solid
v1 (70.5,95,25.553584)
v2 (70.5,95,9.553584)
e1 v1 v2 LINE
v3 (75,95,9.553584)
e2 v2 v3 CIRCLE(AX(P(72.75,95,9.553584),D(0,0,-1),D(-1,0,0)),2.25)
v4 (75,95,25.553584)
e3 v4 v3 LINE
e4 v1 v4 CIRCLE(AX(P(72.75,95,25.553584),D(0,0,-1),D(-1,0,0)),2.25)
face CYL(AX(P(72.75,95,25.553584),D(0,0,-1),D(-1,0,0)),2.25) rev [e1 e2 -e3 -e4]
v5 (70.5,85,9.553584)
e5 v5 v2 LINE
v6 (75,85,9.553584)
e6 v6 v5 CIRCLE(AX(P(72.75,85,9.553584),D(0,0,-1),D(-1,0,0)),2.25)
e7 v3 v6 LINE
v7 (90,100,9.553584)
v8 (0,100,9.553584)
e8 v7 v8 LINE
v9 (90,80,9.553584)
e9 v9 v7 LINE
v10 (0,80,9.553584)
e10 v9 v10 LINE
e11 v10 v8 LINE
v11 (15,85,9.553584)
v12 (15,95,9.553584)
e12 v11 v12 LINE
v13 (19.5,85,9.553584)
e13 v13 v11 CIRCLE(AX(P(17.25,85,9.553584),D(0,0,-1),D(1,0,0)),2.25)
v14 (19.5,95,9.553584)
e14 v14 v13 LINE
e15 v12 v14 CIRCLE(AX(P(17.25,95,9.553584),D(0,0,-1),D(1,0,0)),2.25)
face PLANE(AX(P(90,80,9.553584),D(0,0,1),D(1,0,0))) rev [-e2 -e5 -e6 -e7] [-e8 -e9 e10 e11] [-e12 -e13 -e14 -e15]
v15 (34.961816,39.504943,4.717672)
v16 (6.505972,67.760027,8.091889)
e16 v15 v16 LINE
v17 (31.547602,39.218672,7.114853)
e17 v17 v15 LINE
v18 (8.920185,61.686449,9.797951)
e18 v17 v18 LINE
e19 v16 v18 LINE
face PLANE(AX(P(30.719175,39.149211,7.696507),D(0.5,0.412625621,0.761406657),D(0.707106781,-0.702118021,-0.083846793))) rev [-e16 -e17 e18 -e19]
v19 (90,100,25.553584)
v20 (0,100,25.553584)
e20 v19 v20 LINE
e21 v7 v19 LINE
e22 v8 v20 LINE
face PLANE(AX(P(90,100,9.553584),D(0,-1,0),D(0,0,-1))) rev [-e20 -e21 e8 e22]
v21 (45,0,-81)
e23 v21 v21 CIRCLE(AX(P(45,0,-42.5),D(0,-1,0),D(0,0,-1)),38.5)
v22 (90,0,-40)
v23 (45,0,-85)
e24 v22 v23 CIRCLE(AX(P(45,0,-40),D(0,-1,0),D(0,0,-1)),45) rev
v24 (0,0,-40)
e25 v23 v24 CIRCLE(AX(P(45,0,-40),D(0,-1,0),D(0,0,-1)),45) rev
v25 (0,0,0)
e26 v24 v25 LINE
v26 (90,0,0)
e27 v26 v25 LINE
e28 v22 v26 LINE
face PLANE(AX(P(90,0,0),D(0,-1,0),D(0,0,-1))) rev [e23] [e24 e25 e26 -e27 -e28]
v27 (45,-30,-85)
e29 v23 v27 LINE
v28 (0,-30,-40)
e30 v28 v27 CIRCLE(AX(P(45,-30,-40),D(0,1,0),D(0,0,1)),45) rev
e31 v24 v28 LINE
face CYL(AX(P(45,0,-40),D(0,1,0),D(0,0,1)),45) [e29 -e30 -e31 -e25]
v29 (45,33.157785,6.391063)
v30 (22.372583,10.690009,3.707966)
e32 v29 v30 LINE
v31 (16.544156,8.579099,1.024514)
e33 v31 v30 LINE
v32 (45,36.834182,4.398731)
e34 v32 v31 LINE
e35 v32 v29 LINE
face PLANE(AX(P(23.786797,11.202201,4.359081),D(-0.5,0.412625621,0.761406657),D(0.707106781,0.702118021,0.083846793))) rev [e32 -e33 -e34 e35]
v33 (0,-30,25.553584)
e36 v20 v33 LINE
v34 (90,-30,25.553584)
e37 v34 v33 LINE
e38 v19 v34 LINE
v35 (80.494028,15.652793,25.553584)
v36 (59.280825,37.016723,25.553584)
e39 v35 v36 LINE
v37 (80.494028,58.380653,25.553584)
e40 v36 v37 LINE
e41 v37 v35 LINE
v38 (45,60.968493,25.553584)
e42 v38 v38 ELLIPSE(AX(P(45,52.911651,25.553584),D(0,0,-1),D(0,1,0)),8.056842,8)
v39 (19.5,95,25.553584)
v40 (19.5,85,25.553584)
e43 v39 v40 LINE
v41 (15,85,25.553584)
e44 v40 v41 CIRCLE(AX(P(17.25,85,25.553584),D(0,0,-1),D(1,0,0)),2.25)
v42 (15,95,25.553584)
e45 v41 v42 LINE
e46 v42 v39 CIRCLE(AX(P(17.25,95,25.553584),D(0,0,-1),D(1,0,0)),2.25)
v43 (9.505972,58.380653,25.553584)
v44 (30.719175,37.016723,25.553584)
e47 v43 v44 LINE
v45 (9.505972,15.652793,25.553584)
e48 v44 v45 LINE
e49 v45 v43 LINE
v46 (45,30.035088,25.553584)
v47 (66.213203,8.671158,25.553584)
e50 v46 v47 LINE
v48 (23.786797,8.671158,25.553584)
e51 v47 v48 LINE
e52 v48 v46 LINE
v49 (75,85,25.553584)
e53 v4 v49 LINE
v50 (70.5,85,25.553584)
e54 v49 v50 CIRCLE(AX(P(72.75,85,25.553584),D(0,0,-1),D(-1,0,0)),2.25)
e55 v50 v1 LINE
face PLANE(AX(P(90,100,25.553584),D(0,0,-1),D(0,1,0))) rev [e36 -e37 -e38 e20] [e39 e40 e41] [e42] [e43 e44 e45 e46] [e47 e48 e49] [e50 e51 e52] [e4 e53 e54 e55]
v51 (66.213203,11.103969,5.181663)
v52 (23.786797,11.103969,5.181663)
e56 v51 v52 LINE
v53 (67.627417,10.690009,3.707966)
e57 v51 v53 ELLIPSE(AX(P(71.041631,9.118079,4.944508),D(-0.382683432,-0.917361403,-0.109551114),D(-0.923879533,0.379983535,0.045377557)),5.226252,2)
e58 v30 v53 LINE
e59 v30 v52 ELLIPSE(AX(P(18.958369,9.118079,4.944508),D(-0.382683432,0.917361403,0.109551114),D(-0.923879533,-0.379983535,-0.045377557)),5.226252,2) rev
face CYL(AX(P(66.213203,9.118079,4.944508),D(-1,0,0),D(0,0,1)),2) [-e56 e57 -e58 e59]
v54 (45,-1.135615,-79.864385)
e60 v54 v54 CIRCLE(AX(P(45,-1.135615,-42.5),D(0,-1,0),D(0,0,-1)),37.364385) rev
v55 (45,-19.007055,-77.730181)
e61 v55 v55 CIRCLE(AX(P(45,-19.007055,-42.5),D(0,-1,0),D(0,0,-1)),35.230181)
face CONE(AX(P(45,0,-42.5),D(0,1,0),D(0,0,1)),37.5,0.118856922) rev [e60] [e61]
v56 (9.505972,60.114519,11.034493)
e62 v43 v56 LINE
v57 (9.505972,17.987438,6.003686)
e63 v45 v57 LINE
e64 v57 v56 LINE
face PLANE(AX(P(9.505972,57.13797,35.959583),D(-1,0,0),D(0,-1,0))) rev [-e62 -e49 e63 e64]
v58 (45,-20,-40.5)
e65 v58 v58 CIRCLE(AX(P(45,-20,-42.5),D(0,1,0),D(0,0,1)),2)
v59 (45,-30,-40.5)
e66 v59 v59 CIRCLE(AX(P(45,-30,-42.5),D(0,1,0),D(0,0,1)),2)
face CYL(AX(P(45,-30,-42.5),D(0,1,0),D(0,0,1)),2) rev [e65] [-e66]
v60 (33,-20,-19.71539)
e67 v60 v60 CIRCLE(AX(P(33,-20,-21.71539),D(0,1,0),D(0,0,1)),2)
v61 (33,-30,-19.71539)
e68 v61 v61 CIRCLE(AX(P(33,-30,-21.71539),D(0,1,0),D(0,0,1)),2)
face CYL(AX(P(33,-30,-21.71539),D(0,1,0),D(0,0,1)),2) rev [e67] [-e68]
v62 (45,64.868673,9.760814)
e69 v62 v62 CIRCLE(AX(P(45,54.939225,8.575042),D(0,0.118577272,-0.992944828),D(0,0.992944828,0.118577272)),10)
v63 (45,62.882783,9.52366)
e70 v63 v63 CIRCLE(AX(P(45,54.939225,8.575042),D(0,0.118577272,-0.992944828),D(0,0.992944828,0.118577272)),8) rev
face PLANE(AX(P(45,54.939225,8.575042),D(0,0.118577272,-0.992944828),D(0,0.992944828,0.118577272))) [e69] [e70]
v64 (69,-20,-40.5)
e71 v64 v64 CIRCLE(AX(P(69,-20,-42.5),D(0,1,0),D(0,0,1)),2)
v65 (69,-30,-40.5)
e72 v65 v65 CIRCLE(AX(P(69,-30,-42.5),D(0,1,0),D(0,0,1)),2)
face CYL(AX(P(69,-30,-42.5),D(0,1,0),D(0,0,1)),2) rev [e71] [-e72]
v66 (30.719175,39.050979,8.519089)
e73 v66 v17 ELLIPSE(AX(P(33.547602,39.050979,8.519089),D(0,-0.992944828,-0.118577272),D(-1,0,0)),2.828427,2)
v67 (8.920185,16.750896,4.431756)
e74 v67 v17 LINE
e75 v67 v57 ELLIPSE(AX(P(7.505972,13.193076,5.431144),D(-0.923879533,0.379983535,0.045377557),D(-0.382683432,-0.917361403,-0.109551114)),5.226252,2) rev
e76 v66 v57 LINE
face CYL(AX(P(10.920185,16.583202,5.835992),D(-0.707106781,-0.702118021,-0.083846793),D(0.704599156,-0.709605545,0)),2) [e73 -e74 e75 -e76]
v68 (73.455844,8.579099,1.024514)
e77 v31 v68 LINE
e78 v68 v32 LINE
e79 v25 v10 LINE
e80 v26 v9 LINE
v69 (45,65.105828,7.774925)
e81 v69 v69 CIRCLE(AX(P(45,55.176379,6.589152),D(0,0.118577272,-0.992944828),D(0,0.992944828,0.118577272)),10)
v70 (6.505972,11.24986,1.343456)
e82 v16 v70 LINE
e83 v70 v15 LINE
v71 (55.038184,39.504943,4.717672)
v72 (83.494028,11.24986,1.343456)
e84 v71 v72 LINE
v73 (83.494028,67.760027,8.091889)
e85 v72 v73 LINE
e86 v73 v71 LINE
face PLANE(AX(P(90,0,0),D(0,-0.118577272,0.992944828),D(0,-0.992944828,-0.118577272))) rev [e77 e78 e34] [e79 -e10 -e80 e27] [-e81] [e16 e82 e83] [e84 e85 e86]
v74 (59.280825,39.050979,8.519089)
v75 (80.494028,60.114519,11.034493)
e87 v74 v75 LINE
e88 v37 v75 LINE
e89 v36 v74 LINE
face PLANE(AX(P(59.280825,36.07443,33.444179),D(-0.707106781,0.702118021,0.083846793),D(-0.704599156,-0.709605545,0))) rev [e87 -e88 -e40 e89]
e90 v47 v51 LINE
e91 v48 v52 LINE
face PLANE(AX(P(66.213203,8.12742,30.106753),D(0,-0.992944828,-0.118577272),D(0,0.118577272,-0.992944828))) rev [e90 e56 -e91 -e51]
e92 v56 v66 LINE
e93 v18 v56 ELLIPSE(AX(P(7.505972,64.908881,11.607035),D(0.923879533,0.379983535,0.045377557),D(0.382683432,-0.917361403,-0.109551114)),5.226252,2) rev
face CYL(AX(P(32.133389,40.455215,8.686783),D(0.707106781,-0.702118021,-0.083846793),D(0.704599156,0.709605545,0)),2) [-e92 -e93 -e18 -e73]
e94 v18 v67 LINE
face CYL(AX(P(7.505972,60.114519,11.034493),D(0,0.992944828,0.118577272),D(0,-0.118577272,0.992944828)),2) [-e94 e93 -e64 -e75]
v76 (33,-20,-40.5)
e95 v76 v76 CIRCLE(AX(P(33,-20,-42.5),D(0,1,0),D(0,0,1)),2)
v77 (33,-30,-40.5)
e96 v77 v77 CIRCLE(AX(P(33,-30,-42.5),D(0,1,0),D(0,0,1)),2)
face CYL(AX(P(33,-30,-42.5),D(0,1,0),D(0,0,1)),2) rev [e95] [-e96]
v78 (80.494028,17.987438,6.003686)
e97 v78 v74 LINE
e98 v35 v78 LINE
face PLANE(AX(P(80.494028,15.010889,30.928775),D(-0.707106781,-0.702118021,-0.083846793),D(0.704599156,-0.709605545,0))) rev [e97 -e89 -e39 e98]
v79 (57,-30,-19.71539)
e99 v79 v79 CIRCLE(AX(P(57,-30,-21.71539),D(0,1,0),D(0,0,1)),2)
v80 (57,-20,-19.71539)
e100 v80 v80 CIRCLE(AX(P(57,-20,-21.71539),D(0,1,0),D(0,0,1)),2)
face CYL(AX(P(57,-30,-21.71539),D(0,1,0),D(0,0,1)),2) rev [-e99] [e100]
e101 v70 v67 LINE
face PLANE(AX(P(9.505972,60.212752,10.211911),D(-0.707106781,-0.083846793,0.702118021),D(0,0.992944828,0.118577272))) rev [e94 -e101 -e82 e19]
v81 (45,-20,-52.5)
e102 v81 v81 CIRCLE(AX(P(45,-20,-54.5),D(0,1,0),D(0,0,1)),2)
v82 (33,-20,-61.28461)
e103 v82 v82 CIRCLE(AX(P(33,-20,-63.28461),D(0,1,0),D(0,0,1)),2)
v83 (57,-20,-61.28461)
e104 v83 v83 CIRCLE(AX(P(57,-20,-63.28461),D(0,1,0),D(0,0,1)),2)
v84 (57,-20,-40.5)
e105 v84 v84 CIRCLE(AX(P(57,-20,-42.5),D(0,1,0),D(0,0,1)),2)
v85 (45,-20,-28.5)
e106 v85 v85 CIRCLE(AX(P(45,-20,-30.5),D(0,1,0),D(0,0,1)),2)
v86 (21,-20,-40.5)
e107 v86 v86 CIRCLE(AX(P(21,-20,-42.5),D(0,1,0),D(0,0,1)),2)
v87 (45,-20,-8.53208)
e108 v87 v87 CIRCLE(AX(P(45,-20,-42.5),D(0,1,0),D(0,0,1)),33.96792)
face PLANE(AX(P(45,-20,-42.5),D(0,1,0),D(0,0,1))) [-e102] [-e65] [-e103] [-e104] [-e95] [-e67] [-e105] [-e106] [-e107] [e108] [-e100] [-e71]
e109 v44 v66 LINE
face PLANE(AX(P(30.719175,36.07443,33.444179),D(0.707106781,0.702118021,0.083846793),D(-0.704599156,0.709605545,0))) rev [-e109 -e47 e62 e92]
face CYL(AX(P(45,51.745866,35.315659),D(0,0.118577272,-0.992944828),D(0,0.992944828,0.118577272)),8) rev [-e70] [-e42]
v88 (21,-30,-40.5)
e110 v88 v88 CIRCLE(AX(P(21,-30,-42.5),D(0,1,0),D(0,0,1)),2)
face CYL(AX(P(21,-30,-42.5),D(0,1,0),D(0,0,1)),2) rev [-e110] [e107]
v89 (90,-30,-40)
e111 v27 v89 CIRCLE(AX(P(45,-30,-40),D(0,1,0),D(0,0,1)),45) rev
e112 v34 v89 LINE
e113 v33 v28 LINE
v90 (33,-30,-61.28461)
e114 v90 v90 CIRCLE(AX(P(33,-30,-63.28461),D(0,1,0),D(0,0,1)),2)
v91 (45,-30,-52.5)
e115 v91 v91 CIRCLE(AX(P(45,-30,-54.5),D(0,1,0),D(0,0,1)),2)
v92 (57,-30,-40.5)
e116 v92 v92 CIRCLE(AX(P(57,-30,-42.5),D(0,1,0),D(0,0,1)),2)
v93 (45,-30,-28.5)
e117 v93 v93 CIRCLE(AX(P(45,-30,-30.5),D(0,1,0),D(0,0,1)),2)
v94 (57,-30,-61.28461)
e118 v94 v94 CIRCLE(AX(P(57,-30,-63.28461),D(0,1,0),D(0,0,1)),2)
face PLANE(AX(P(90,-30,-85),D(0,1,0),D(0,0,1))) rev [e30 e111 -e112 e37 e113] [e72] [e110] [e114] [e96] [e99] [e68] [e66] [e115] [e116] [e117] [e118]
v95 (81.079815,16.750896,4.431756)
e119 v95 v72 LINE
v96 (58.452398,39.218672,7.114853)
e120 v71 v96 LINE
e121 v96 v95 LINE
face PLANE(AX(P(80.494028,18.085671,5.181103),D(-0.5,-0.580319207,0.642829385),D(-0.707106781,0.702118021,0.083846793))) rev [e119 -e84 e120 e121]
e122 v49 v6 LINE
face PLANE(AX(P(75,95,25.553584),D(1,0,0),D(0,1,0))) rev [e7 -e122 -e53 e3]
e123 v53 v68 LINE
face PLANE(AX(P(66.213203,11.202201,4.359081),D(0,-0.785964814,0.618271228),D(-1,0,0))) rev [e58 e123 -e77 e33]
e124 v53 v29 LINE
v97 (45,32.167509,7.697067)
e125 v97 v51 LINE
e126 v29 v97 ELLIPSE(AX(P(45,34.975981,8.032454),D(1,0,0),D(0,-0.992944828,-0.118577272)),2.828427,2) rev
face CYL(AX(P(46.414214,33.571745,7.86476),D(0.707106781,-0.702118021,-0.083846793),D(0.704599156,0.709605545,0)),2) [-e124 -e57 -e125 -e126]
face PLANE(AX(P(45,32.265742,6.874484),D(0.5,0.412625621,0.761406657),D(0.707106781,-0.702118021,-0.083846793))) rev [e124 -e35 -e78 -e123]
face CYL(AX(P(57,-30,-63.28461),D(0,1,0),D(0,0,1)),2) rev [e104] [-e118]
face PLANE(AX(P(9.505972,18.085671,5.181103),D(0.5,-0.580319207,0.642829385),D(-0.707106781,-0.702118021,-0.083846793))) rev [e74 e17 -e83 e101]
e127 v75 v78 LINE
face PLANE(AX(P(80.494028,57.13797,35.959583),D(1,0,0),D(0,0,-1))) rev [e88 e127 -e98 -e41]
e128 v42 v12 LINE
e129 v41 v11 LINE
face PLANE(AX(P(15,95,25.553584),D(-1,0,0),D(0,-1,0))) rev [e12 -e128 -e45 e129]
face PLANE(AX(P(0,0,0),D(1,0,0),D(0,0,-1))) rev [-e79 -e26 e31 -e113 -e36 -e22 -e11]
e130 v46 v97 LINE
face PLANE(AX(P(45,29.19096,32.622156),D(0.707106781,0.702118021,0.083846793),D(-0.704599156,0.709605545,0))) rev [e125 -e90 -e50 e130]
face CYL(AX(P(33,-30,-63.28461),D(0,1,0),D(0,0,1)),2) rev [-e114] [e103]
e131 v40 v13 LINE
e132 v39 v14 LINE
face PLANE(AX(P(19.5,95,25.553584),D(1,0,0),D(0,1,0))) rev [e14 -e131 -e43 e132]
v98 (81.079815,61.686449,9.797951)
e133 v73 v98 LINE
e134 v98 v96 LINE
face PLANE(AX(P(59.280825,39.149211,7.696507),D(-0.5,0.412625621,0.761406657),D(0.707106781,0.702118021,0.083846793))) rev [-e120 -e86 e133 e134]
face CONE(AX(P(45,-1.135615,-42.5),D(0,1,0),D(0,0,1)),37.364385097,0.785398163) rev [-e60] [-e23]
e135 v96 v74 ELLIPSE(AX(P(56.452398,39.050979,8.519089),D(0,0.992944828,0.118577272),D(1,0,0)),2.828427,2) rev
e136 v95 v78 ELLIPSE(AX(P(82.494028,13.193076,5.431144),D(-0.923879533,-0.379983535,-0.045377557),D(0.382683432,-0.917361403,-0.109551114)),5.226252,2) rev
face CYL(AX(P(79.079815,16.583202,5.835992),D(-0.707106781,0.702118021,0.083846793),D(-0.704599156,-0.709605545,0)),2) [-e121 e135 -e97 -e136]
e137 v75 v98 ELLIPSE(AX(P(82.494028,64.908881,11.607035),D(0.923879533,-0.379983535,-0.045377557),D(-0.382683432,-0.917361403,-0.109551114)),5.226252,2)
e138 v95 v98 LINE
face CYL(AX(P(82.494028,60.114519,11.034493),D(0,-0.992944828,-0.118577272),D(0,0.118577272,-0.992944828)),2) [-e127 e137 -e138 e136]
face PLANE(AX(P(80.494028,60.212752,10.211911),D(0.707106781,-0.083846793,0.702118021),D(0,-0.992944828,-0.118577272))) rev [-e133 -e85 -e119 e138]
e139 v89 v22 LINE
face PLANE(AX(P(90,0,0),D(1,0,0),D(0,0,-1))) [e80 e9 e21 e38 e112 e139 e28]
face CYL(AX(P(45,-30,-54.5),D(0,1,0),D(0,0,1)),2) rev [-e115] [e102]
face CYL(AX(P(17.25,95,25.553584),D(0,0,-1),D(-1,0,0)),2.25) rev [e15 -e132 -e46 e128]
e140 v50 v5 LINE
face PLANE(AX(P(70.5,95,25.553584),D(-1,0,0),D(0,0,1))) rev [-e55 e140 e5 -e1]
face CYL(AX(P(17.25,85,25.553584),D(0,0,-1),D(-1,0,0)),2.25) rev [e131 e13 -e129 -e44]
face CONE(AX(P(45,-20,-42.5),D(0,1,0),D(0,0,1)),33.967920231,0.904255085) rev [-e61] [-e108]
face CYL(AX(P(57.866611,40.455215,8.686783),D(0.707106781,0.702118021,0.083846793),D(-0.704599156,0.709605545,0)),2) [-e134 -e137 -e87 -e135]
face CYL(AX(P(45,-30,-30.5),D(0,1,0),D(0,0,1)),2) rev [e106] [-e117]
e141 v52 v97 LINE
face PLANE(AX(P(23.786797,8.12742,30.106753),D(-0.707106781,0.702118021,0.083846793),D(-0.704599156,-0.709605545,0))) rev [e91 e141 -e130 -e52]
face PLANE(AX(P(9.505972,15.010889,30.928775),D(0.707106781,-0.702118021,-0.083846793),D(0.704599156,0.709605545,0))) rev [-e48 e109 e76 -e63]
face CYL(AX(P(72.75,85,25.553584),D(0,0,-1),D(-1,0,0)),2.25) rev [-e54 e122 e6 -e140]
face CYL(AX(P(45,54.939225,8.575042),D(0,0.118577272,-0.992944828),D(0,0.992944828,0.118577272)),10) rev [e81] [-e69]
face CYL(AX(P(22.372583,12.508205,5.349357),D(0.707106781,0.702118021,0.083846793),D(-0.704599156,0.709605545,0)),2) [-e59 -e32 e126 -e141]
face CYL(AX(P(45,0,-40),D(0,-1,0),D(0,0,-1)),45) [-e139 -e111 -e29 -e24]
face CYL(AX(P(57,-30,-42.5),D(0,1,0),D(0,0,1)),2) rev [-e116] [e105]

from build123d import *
from OCP.BRepFilletAPI import BRepFilletAPI_MakeChamfer

# Parameters (mm, degrees)
BOSS_EXTRUDE1_DEPTH = 90
CUT_EXTRUDE1_DEPTH  = 165.439594476
SKETCH4_R           = 37.5
CUT_EXTRUDE2_DEPTH  = 20
CUT_EXTRUDE2_DRAFT  = -6.81
SKETCH5_R           = 8
CUT_EXTRUDE3_DEPTH  = 160.138304628
SKETCH6_R           = 10
CUT_EXTRUDE4_DEPTH  = 2
FILLET1_R           = 45
CUT_EXTRUDE5_DEPTH  = 160.138304628
CHAMFER1_SIZE       = 3
CHAMFER2_SIZE       = 1
CHAMFER2_SIZE2      = 1.14368379
FILLET3_R           = 2
SKETCH8_R           = 2
CUT_EXTRUDE6_DEPTH  = 173.409396496


with BuildPart() as part:
    # Sketch1 → Boss-Extrude1 (new body)
    with BuildSketch(Plane(origin=(0, 0, 0), x_dir=(0, 0, -1), z_dir=(1, 0, 0))):
        Polygon((0, 0), (85, 0), (85, -30), (-25.553583916, -30), (-25.553583916, 100), (-9.553583916, 100), (-9.553583916, 80), align=None)
    extrude(amount=BOSS_EXTRUDE1_DEPTH)

    # Sketch2 → Cut-Extrude1 (cut, through all)
    with BuildSketch(Plane(origin=(0, 0, 9.553583916), x_dir=(-1, 0, 0), z_dir=(0, 0, -1))):
        with BuildLine():
            Line((-70.5, 95), (-70.5, 85))
            ThreePointArc((-70.5, 85), (-72.75, 82.75), (-75, 85))
            Line((-75, 85), (-75, 95))
            ThreePointArc((-75, 95), (-72.75, 97.25), (-70.5, 95))
        make_face()
        with BuildLine():
            Line((-19.5, 95), (-19.5, 85))
            ThreePointArc((-19.5, 85), (-17.25, 82.75), (-15, 85))
            Line((-15, 85), (-15, 95))
            ThreePointArc((-15, 95), (-17.25, 97.25), (-19.5, 95))
        make_face()
    extrude(amount=-CUT_EXTRUDE1_DEPTH, mode=Mode.SUBTRACT)


with BuildPart() as cut_extrude2_tool:
    # Sketch4 → Cut-Extrude2 (with draft: the straight prism first)
    with BuildSketch(Plane(origin=(0, 0, 0), x_dir=(1, 0, 0), z_dir=(0, 1, 0))):
        with Locations((45, 42.5)):
            Circle(SKETCH4_R)
    extrude(amount=-CUT_EXTRUDE2_DEPTH)
    # Cut-Extrude2: the draft: its side faces are tilted about the plane it starts from
    cut_extrude2_sides = [cut_extrude2_tool.faces().sort_by_distance(p)[0] for p in [
        (7.5, -10, -42.5),
    ]]
    draft(cut_extrude2_sides, Plane(origin=(0, 0, 0), x_dir=(1, 0, 0), z_dir=(0, 1, 0)), CUT_EXTRUDE2_DRAFT)


with BuildPart() as part_1:
    add(part.part)

    # Cut-Extrude2: cut by cut_extrude2_tool
    add(cut_extrude2_tool.part, mode=Mode.SUBTRACT)

    # Sketch5 → Cut-Extrude3 (cut, through all)
    with BuildSketch(Plane(origin=(0, 0, 0), x_dir=(-1, 0, 0), z_dir=(0, 0.11857727167698189, -0.9929448275919681))):
        with Locations(Location((-45, 55.568424123, 0), (0, 0, 90))):
            Circle(SKETCH5_R)
    extrude(amount=-CUT_EXTRUDE3_DEPTH, mode=Mode.SUBTRACT)

    # Sketch6 → Cut-Extrude4 (cut)
    with BuildSketch(Plane(origin=(0, 0, 0), x_dir=(-1, 0, 0), z_dir=(0, 0.11857727167698189, -0.9929448275919681))):
        with Locations(Location((-45, 55.568424123, 0), (0, 0, 90))):
            Circle(SKETCH6_R)
    extrude(amount=-CUT_EXTRUDE4_DEPTH, mode=Mode.SUBTRACT)

    # Fillet1
    fillet1_edges = [part_1.edges().sort_by_distance(p)[0] for p in [
        (0, -15, -85),
        (90, -15, -85),
    ]]
    fillet(fillet1_edges, radius=FILLET1_R - 0.0001)  # a hair under: the kernel refuses the full size

    # Sketch7 → Cut-Extrude5 (cut, through all)
    with BuildSketch(Plane(origin=(0, 0, 0), x_dir=(-1, 0, 0), z_dir=(0, 0.11857727167698176, -0.9929448275919681))):
        Polygon((-45, 32.853259254), (-66.213203436, 11.640055819), (-23.786796564, 11.640055819), align=None)
        Polygon((-80.494028285, 18.572434405), (-59.280824849, 39.78563784), (-80.494028285, 60.998841276), align=None)
        Polygon((-30.719175151, 39.78563784), (-9.505971715, 60.998841276), (-9.505971715, 18.572434405), align=None)
    extrude(amount=-CUT_EXTRUDE5_DEPTH, mode=Mode.SUBTRACT)

    # Chamfer1
    chamfer1_edges = [part_1.edges().sort_by_distance(p)[0] for p in [
        (34.393398282, 22.089703532, 2.637947955),
        (55.606601718, 22.089703532, 2.637947955),
        (45, 11.557933218, 1.380246061),
        (20.112573433, 28.973172992, 3.459970494),
        (9.505971715, 39.504943306, 4.717672387),
        (20.112573433, 50.03671362, 5.97537428),
        (80.494028285, 39.504943306, 4.717672387),
        (69.887426567, 28.973172992, 3.459970494),
        (69.887426567, 50.03671362, 5.97537428),
    ]]
    chamfer(chamfer1_edges, length=CHAMFER1_SIZE)

    # Chamfer2: one chamfer whose edges measure the first distance from different faces: ONE call of the kernel's chamfer builder (chamfer() names one face for all edges)
    chamfer2_edges_1 = [part_1.edges().sort_by_distance(p)[0] for p in [
        (9.888395979, -20, -42.5),
    ]]
    chamfer2_side_1 = [part_1.faces().sort_by_distance(p)[0] for p in [
        (8.694197989, -10, -42.5),
    ]]
    chamfer2_edges_2 = [part_1.edges().sort_by_distance(p)[0] for p in [
        (7.5, 0, -42.5),
    ]]
    chamfer2_side_2 = [part_1.faces().sort_by_distance(p)[0] for p in [
        (1.23794184, 0, -20.00005),
    ]]
    chamfer2 = BRepFilletAPI_MakeChamfer(part_1.part.solid().wrapped)
    for e in chamfer2_edges_1:
        chamfer2.Add(CHAMFER2_SIZE, CHAMFER2_SIZE2, e.wrapped, chamfer2_side_1[0].wrapped)  # the first distance lies on this face
    for e in chamfer2_edges_2:
        chamfer2.Add(CHAMFER2_SIZE, CHAMFER2_SIZE2, e.wrapped, chamfer2_side_2[0].wrapped)  # the first distance lies on this face
    add(Compound.cast(chamfer2.Shape()), mode=Mode.REPLACE)

    # Fillet3
    fillet3_edges = [part_1.edges().sort_by_distance(p)[0] for p in [
        (45, 11.202201403, 4.359080544),
        (55.606601718, 21.733971717, 5.616782437),
        (34.393398282, 21.733971717, 5.616782437),
        (20.112573433, 28.617441177, 6.438804976),
        (9.505971715, 39.149211491, 7.69650687),
        (20.112573433, 49.680981805, 8.954208763),
        (69.887426567, 28.617441177, 6.438804976),
        (80.494028285, 39.149211491, 7.69650687),
        (69.887426567, 49.680981805, 8.954208763),
    ]]
    fillet(fillet3_edges, radius=FILLET3_R)

    # Sketch8 → Cut-Extrude6 (cut, through all)
    with BuildSketch(Plane(origin=(0, -20, 0), x_dir=(1, 0, 0), z_dir=(0, 1, 0))):
        with Locations(Location((45, 42.5, 0), (0, 0, 270))):
            Circle(SKETCH8_R)
        with Locations(Location((45, 54.5, 0), (0, 0, 270))):
            Circle(SKETCH8_R)
        with Locations(Location((21, 42.5, 0), (0, 0, 270))):
            Circle(SKETCH8_R)
        with Locations(Location((57, 42.5, 0), (0, 0, 270))):
            Circle(SKETCH8_R)
        with Locations(Location((45, 30.5, 0), (0, 0, 270))):
            Circle(SKETCH8_R)
        with Locations(Location((33, 42.5, 0), (0, 0, 270))):
            Circle(SKETCH8_R)
        with Locations(Location((33, 63.284609691, 0), (0, 0, 270))):
            Circle(SKETCH8_R)
        with Locations(Location((57, 63.284609691, 0), (0, 0, 270))):
            Circle(SKETCH8_R)
        with Locations(Location((69, 42.5, 0), (0, 0, 270))):
            Circle(SKETCH8_R)
        with Locations(Location((57, 21.715390309, 0), (0, 0, 270))):
            Circle(SKETCH8_R)
        with Locations(Location((33, 21.715390309, 0), (0, 0, 270))):
            Circle(SKETCH8_R)
    extrude(amount=-CUT_EXTRUDE6_DEPTH, mode=Mode.SUBTRACT)


solid = part_1.part
